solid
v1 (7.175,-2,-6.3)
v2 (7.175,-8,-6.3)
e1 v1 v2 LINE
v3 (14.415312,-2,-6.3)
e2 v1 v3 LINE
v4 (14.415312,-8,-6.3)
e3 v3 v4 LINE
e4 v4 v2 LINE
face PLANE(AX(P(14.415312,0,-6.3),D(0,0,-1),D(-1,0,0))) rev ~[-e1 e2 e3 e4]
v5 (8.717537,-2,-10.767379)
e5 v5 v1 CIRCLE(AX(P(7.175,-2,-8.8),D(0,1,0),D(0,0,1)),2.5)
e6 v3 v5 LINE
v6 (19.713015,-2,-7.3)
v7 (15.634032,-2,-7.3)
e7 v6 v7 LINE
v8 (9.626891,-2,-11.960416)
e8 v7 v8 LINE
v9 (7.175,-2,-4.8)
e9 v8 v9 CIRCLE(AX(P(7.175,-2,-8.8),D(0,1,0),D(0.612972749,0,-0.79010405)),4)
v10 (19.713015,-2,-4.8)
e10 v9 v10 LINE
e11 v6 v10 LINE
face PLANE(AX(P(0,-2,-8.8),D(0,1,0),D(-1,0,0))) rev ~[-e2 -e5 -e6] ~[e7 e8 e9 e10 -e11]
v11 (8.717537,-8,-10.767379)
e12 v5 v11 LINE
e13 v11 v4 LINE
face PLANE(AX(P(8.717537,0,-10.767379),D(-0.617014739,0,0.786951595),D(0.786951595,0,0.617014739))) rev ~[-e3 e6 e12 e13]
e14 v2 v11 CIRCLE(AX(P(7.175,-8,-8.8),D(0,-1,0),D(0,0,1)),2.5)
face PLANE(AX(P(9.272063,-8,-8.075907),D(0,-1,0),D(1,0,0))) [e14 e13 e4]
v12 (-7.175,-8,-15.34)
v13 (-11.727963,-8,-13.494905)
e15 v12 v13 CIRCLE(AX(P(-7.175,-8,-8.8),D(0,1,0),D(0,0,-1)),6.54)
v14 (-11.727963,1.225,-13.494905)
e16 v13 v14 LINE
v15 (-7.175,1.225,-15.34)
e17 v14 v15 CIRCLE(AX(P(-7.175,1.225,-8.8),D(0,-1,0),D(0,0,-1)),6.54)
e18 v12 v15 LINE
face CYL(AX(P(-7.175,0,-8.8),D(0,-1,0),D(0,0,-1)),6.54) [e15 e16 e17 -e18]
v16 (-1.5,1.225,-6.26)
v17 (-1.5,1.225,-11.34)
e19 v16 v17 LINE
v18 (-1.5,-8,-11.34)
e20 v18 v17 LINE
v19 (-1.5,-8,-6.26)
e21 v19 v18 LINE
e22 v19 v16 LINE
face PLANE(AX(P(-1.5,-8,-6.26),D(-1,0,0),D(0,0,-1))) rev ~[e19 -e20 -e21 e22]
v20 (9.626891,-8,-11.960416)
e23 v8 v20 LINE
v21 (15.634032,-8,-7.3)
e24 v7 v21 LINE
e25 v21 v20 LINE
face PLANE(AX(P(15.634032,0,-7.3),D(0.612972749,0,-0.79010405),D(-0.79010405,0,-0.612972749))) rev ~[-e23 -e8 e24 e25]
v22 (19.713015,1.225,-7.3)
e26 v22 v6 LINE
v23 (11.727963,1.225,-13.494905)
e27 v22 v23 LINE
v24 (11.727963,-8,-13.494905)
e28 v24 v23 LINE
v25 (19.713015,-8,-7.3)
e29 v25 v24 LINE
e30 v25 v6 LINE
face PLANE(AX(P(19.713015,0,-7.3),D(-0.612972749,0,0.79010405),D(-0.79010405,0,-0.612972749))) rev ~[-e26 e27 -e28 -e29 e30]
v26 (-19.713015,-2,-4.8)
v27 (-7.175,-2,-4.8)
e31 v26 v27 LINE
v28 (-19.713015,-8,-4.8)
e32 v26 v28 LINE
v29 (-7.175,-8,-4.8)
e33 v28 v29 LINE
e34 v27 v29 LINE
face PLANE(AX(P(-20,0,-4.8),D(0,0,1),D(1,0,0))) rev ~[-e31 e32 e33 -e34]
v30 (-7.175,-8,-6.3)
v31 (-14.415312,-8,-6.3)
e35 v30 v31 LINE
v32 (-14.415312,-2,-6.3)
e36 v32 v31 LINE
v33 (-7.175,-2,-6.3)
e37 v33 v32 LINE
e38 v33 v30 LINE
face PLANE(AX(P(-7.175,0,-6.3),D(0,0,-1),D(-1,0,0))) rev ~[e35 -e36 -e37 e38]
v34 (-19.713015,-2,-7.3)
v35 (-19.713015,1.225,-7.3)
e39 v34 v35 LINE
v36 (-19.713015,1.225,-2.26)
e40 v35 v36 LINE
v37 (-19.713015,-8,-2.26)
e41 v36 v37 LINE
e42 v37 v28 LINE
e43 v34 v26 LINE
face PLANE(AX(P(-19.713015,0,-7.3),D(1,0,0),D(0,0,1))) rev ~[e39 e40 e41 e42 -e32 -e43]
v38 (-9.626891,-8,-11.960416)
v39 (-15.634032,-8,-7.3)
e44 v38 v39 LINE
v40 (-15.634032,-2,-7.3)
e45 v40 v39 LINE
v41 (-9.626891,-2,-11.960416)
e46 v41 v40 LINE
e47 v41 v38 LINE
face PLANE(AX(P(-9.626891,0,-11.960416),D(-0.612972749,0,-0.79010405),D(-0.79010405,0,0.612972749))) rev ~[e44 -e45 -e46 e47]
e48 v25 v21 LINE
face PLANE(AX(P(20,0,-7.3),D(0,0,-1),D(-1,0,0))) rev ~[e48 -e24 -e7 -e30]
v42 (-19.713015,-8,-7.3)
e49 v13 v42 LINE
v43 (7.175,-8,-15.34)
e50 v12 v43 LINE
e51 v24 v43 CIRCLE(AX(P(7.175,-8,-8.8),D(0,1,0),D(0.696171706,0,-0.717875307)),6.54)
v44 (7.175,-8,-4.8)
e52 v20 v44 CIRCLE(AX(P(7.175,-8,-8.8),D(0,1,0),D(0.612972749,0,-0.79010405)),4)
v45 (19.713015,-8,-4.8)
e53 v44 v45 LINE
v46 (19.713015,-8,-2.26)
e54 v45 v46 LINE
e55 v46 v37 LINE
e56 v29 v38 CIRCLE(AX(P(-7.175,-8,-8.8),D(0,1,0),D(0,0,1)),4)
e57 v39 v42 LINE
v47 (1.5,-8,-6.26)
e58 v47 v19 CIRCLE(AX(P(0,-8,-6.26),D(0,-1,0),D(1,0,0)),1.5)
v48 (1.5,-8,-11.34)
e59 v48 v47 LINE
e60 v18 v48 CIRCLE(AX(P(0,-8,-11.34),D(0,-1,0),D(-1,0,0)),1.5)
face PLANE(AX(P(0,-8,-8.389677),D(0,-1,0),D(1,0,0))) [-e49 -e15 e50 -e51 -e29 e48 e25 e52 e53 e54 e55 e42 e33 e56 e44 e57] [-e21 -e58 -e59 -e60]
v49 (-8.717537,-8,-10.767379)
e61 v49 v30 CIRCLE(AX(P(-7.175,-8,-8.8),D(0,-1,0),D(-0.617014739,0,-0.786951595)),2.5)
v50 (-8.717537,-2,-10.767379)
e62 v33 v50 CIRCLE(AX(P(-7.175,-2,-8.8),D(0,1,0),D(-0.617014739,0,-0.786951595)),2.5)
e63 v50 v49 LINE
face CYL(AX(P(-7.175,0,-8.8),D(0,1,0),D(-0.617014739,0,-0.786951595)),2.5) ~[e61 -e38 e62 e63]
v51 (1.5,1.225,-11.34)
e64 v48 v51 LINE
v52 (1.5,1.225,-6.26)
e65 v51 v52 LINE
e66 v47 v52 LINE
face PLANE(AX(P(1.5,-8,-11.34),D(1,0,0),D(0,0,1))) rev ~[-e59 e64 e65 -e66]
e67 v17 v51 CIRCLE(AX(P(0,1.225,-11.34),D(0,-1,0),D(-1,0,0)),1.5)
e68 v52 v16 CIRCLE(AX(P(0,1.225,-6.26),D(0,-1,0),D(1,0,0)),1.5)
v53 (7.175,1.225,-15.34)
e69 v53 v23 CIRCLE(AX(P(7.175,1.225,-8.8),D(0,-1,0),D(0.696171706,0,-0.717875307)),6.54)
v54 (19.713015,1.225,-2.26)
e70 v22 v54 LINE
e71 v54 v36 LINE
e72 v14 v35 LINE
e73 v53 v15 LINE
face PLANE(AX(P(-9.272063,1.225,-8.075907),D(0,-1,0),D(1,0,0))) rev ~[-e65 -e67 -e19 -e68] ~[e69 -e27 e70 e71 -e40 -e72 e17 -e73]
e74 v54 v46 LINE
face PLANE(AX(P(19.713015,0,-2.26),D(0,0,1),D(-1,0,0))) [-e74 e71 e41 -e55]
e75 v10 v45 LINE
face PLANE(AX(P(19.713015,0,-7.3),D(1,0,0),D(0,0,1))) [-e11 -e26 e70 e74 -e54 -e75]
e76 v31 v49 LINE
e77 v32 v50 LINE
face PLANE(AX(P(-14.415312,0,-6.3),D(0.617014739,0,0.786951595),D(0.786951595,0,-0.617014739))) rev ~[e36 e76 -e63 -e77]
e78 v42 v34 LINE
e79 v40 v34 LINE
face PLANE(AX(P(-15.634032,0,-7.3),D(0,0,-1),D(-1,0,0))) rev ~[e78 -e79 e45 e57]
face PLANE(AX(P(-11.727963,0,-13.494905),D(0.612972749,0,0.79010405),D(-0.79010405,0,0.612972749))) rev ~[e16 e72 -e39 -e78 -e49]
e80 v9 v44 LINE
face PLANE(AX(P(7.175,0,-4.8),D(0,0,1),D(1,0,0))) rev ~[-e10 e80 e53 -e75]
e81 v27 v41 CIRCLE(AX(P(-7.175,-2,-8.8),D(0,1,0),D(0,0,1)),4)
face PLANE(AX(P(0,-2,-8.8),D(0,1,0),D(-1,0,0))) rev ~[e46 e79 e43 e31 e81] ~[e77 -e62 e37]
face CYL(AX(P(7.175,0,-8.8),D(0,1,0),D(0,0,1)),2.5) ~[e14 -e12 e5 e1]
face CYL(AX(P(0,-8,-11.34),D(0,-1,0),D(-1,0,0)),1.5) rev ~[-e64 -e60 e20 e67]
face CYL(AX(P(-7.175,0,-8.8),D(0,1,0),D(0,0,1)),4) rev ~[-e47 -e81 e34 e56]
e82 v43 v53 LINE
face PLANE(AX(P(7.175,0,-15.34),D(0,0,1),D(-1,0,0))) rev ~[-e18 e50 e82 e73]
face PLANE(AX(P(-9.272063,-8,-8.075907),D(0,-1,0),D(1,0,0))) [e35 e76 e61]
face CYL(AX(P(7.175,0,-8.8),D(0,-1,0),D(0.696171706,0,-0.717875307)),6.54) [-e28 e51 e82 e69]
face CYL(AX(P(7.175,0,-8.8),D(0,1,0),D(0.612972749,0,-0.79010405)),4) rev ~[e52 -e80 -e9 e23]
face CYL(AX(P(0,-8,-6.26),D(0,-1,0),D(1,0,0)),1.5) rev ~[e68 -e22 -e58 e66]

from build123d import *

# Parameters (mm, degrees)
F2_DEPTH  = 8
F3_W      = 40
F3_H      = 13.08
F4_DEPTH  = 2
F8_DEPTH  = 25.4
F9_DEPTH  = 0.2869853
F10_DEPTH = 0.2869852618
F11_DEPTH = 1.225
F13_DEPTH = 25.4


# Not quite as in the source:
# - an extrude ends at something that could not be found from the text; its depth is read off the source's solid


with BuildPart() as f2:
    # F1 (on Front) → F2 (new body)
    with BuildSketch(Plane.XZ):
        with BuildLine():
            Line((0, -2.26), (-20, -2.26))
            Line((-20, -2.26), (-20, -4.8))
            Line((-20, -4.8), (-7.175, -4.8))
            ThreePointArc((-7.175, -4.8), (-3.3907124319, -10.0958269953), (-9.6268909943, -11.9604161992))
            Line((-9.6268909943, -11.9604161992), (-15.6340319663, -7.3))
            Line((-15.6340319663, -7.3), (-20, -7.3))
            Line((-20, -7.3), (-20, -15.34))
            Line((-20, -15.34), (0, -15.34))
            Line((0, -15.34), (20, -15.34))
            Line((20, -15.34), (20, -7.3))
            Line((20, -7.3), (15.6340319663, -7.3))
            Line((15.6340319663, -7.3), (9.6268909943, -11.9604161992))
            ThreePointArc((9.6268909943, -11.9604161992), (3.3907124319, -10.0958269953), (7.175, -4.8))
            Line((7.175, -4.8), (20, -4.8))
            Line((20, -4.8), (20, -2.26))
            Line((20, -2.26), (0, -2.26))
        make_face()
    extrude(amount=F2_DEPTH)


with BuildPart() as f2b:
    # F1 (on Front) → F2, piece 2 (new body)
    with BuildSketch(Plane.XZ):
        with BuildLine():
            Line((-14.4153116271, -6.3), (-8.7175368467, -10.7673789865))
            ThreePointArc((-8.7175368467, -10.7673789865), (-4.8119037825, -9.6159511424), (-7.175, -6.3))
            Line((-7.175, -6.3), (-14.4153116271, -6.3))
        make_face()
    extrude(amount=F2_DEPTH)


with BuildPart() as f2c:
    # F1 (on Front) → F2, piece 3 (new body)
    with BuildSketch(Plane.XZ):
        with BuildLine():
            Line((8.7175368467, -10.7673789865), (14.4153116271, -6.3))
            Line((14.4153116271, -6.3), (7.175, -6.3))
            ThreePointArc((7.175, -6.3), (4.8119037825, -9.6159511424), (8.7175368467, -10.7673789865))
        make_face()
    extrude(amount=F2_DEPTH)


with BuildPart() as f4:
    # F3 (on face) → F4 (new body)
    with BuildSketch(Plane(origin=(0, 0, 0), x_dir=(-1, 0, 0), z_dir=(0, 1, 0))):
        with Locations((0, -8.8)):
            Rectangle(F3_W, F3_H)
    extrude(amount=-F4_DEPTH)

    # F5: union F2
    add(f2.part)


with BuildPart() as f2c_1:
    add(f2c.part)

    # F6: union F4, F2b
    add(f4.part)
    add(f2b.part)

    # F7 (on face) → F8 (cut)
    with BuildSketch(Plane.XZ.offset(8)):
        with BuildLine():
            Line((22.5005224347, -7.3), (20, -7.3))
            Line((20, -7.3), (19.7130147382, -7.3))
            Line((19.7130147382, -7.3), (11.7279629554, -13.4949045067))
            ThreePointArc((11.7279629554, -13.4949045067), (9.6313107017, -14.8611993646), (7.175, -15.34))
            Line((7.175, -15.34), (7.175, -19.2080270499))
            Line((7.175, -19.2080270499), (22.5005224347, -19.2080270499))
            Line((22.5005224347, -19.2080270499), (22.5005224347, -7.3))
        make_face()
        with BuildLine():
            Line((-19.7130147382, -7.3), (-20, -7.3))
            Line((-20, -7.3), (-22.5005224347, -7.3))
            Line((-22.5005224347, -7.3), (-22.5005224347, -19.2080270499))
            Line((-22.5005224347, -19.2080270499), (-7.175, -19.2080270499))
            Line((-7.175, -19.2080270499), (-7.175, -15.34))
            ThreePointArc((-7.175, -15.34), (-9.6313107017, -14.8611993646), (-11.7279629554, -13.4949045067))
            Line((-11.7279629554, -13.4949045067), (-19.7130147382, -7.3))
        make_face()
    extrude(amount=-F8_DEPTH, mode=Mode.SUBTRACT)

    # F9 (cut, through all): a face of the model
    f9_faces = [f2c_1.faces().sort_by_distance(p)[0] for p in [
        (20, -3.4075829384, -4.0276303318),
    ]]
    extrude(f9_faces, amount=-F9_DEPTH, mode=Mode.SUBTRACT)

    # F10 (cut, through all): a face of the model
    f10_faces = [f2c_1.faces().sort_by_distance(p)[0] for p in [
        (-20, -3.4075829384, -4.0276303318),
    ]]
    extrude(f10_faces, amount=-F10_DEPTH, mode=Mode.SUBTRACT)

    # F11 (add): a face of the model
    f11_faces = [f2c_1.faces().sort_by_distance(p)[0] for p in [
        (-8.8e-09, 0, -8.042025569),
    ]]
    extrude(f11_faces, amount=F11_DEPTH)

    # F12 (on face) → F13 (cut)
    with BuildSketch(Plane.XZ.offset(8)):
        with BuildLine():
            ThreePointArc((-1.5, -11.34), (0, -12.84), (1.5, -11.34))
            Line((1.5, -11.34), (1.5, -6.26))
            ThreePointArc((1.5, -6.26), (0, -4.76), (-1.5, -6.26))
            Line((-1.5, -6.26), (-1.5, -11.34))
        make_face()
    extrude(amount=-F13_DEPTH, mode=Mode.SUBTRACT)


solid = f2c_1.part
